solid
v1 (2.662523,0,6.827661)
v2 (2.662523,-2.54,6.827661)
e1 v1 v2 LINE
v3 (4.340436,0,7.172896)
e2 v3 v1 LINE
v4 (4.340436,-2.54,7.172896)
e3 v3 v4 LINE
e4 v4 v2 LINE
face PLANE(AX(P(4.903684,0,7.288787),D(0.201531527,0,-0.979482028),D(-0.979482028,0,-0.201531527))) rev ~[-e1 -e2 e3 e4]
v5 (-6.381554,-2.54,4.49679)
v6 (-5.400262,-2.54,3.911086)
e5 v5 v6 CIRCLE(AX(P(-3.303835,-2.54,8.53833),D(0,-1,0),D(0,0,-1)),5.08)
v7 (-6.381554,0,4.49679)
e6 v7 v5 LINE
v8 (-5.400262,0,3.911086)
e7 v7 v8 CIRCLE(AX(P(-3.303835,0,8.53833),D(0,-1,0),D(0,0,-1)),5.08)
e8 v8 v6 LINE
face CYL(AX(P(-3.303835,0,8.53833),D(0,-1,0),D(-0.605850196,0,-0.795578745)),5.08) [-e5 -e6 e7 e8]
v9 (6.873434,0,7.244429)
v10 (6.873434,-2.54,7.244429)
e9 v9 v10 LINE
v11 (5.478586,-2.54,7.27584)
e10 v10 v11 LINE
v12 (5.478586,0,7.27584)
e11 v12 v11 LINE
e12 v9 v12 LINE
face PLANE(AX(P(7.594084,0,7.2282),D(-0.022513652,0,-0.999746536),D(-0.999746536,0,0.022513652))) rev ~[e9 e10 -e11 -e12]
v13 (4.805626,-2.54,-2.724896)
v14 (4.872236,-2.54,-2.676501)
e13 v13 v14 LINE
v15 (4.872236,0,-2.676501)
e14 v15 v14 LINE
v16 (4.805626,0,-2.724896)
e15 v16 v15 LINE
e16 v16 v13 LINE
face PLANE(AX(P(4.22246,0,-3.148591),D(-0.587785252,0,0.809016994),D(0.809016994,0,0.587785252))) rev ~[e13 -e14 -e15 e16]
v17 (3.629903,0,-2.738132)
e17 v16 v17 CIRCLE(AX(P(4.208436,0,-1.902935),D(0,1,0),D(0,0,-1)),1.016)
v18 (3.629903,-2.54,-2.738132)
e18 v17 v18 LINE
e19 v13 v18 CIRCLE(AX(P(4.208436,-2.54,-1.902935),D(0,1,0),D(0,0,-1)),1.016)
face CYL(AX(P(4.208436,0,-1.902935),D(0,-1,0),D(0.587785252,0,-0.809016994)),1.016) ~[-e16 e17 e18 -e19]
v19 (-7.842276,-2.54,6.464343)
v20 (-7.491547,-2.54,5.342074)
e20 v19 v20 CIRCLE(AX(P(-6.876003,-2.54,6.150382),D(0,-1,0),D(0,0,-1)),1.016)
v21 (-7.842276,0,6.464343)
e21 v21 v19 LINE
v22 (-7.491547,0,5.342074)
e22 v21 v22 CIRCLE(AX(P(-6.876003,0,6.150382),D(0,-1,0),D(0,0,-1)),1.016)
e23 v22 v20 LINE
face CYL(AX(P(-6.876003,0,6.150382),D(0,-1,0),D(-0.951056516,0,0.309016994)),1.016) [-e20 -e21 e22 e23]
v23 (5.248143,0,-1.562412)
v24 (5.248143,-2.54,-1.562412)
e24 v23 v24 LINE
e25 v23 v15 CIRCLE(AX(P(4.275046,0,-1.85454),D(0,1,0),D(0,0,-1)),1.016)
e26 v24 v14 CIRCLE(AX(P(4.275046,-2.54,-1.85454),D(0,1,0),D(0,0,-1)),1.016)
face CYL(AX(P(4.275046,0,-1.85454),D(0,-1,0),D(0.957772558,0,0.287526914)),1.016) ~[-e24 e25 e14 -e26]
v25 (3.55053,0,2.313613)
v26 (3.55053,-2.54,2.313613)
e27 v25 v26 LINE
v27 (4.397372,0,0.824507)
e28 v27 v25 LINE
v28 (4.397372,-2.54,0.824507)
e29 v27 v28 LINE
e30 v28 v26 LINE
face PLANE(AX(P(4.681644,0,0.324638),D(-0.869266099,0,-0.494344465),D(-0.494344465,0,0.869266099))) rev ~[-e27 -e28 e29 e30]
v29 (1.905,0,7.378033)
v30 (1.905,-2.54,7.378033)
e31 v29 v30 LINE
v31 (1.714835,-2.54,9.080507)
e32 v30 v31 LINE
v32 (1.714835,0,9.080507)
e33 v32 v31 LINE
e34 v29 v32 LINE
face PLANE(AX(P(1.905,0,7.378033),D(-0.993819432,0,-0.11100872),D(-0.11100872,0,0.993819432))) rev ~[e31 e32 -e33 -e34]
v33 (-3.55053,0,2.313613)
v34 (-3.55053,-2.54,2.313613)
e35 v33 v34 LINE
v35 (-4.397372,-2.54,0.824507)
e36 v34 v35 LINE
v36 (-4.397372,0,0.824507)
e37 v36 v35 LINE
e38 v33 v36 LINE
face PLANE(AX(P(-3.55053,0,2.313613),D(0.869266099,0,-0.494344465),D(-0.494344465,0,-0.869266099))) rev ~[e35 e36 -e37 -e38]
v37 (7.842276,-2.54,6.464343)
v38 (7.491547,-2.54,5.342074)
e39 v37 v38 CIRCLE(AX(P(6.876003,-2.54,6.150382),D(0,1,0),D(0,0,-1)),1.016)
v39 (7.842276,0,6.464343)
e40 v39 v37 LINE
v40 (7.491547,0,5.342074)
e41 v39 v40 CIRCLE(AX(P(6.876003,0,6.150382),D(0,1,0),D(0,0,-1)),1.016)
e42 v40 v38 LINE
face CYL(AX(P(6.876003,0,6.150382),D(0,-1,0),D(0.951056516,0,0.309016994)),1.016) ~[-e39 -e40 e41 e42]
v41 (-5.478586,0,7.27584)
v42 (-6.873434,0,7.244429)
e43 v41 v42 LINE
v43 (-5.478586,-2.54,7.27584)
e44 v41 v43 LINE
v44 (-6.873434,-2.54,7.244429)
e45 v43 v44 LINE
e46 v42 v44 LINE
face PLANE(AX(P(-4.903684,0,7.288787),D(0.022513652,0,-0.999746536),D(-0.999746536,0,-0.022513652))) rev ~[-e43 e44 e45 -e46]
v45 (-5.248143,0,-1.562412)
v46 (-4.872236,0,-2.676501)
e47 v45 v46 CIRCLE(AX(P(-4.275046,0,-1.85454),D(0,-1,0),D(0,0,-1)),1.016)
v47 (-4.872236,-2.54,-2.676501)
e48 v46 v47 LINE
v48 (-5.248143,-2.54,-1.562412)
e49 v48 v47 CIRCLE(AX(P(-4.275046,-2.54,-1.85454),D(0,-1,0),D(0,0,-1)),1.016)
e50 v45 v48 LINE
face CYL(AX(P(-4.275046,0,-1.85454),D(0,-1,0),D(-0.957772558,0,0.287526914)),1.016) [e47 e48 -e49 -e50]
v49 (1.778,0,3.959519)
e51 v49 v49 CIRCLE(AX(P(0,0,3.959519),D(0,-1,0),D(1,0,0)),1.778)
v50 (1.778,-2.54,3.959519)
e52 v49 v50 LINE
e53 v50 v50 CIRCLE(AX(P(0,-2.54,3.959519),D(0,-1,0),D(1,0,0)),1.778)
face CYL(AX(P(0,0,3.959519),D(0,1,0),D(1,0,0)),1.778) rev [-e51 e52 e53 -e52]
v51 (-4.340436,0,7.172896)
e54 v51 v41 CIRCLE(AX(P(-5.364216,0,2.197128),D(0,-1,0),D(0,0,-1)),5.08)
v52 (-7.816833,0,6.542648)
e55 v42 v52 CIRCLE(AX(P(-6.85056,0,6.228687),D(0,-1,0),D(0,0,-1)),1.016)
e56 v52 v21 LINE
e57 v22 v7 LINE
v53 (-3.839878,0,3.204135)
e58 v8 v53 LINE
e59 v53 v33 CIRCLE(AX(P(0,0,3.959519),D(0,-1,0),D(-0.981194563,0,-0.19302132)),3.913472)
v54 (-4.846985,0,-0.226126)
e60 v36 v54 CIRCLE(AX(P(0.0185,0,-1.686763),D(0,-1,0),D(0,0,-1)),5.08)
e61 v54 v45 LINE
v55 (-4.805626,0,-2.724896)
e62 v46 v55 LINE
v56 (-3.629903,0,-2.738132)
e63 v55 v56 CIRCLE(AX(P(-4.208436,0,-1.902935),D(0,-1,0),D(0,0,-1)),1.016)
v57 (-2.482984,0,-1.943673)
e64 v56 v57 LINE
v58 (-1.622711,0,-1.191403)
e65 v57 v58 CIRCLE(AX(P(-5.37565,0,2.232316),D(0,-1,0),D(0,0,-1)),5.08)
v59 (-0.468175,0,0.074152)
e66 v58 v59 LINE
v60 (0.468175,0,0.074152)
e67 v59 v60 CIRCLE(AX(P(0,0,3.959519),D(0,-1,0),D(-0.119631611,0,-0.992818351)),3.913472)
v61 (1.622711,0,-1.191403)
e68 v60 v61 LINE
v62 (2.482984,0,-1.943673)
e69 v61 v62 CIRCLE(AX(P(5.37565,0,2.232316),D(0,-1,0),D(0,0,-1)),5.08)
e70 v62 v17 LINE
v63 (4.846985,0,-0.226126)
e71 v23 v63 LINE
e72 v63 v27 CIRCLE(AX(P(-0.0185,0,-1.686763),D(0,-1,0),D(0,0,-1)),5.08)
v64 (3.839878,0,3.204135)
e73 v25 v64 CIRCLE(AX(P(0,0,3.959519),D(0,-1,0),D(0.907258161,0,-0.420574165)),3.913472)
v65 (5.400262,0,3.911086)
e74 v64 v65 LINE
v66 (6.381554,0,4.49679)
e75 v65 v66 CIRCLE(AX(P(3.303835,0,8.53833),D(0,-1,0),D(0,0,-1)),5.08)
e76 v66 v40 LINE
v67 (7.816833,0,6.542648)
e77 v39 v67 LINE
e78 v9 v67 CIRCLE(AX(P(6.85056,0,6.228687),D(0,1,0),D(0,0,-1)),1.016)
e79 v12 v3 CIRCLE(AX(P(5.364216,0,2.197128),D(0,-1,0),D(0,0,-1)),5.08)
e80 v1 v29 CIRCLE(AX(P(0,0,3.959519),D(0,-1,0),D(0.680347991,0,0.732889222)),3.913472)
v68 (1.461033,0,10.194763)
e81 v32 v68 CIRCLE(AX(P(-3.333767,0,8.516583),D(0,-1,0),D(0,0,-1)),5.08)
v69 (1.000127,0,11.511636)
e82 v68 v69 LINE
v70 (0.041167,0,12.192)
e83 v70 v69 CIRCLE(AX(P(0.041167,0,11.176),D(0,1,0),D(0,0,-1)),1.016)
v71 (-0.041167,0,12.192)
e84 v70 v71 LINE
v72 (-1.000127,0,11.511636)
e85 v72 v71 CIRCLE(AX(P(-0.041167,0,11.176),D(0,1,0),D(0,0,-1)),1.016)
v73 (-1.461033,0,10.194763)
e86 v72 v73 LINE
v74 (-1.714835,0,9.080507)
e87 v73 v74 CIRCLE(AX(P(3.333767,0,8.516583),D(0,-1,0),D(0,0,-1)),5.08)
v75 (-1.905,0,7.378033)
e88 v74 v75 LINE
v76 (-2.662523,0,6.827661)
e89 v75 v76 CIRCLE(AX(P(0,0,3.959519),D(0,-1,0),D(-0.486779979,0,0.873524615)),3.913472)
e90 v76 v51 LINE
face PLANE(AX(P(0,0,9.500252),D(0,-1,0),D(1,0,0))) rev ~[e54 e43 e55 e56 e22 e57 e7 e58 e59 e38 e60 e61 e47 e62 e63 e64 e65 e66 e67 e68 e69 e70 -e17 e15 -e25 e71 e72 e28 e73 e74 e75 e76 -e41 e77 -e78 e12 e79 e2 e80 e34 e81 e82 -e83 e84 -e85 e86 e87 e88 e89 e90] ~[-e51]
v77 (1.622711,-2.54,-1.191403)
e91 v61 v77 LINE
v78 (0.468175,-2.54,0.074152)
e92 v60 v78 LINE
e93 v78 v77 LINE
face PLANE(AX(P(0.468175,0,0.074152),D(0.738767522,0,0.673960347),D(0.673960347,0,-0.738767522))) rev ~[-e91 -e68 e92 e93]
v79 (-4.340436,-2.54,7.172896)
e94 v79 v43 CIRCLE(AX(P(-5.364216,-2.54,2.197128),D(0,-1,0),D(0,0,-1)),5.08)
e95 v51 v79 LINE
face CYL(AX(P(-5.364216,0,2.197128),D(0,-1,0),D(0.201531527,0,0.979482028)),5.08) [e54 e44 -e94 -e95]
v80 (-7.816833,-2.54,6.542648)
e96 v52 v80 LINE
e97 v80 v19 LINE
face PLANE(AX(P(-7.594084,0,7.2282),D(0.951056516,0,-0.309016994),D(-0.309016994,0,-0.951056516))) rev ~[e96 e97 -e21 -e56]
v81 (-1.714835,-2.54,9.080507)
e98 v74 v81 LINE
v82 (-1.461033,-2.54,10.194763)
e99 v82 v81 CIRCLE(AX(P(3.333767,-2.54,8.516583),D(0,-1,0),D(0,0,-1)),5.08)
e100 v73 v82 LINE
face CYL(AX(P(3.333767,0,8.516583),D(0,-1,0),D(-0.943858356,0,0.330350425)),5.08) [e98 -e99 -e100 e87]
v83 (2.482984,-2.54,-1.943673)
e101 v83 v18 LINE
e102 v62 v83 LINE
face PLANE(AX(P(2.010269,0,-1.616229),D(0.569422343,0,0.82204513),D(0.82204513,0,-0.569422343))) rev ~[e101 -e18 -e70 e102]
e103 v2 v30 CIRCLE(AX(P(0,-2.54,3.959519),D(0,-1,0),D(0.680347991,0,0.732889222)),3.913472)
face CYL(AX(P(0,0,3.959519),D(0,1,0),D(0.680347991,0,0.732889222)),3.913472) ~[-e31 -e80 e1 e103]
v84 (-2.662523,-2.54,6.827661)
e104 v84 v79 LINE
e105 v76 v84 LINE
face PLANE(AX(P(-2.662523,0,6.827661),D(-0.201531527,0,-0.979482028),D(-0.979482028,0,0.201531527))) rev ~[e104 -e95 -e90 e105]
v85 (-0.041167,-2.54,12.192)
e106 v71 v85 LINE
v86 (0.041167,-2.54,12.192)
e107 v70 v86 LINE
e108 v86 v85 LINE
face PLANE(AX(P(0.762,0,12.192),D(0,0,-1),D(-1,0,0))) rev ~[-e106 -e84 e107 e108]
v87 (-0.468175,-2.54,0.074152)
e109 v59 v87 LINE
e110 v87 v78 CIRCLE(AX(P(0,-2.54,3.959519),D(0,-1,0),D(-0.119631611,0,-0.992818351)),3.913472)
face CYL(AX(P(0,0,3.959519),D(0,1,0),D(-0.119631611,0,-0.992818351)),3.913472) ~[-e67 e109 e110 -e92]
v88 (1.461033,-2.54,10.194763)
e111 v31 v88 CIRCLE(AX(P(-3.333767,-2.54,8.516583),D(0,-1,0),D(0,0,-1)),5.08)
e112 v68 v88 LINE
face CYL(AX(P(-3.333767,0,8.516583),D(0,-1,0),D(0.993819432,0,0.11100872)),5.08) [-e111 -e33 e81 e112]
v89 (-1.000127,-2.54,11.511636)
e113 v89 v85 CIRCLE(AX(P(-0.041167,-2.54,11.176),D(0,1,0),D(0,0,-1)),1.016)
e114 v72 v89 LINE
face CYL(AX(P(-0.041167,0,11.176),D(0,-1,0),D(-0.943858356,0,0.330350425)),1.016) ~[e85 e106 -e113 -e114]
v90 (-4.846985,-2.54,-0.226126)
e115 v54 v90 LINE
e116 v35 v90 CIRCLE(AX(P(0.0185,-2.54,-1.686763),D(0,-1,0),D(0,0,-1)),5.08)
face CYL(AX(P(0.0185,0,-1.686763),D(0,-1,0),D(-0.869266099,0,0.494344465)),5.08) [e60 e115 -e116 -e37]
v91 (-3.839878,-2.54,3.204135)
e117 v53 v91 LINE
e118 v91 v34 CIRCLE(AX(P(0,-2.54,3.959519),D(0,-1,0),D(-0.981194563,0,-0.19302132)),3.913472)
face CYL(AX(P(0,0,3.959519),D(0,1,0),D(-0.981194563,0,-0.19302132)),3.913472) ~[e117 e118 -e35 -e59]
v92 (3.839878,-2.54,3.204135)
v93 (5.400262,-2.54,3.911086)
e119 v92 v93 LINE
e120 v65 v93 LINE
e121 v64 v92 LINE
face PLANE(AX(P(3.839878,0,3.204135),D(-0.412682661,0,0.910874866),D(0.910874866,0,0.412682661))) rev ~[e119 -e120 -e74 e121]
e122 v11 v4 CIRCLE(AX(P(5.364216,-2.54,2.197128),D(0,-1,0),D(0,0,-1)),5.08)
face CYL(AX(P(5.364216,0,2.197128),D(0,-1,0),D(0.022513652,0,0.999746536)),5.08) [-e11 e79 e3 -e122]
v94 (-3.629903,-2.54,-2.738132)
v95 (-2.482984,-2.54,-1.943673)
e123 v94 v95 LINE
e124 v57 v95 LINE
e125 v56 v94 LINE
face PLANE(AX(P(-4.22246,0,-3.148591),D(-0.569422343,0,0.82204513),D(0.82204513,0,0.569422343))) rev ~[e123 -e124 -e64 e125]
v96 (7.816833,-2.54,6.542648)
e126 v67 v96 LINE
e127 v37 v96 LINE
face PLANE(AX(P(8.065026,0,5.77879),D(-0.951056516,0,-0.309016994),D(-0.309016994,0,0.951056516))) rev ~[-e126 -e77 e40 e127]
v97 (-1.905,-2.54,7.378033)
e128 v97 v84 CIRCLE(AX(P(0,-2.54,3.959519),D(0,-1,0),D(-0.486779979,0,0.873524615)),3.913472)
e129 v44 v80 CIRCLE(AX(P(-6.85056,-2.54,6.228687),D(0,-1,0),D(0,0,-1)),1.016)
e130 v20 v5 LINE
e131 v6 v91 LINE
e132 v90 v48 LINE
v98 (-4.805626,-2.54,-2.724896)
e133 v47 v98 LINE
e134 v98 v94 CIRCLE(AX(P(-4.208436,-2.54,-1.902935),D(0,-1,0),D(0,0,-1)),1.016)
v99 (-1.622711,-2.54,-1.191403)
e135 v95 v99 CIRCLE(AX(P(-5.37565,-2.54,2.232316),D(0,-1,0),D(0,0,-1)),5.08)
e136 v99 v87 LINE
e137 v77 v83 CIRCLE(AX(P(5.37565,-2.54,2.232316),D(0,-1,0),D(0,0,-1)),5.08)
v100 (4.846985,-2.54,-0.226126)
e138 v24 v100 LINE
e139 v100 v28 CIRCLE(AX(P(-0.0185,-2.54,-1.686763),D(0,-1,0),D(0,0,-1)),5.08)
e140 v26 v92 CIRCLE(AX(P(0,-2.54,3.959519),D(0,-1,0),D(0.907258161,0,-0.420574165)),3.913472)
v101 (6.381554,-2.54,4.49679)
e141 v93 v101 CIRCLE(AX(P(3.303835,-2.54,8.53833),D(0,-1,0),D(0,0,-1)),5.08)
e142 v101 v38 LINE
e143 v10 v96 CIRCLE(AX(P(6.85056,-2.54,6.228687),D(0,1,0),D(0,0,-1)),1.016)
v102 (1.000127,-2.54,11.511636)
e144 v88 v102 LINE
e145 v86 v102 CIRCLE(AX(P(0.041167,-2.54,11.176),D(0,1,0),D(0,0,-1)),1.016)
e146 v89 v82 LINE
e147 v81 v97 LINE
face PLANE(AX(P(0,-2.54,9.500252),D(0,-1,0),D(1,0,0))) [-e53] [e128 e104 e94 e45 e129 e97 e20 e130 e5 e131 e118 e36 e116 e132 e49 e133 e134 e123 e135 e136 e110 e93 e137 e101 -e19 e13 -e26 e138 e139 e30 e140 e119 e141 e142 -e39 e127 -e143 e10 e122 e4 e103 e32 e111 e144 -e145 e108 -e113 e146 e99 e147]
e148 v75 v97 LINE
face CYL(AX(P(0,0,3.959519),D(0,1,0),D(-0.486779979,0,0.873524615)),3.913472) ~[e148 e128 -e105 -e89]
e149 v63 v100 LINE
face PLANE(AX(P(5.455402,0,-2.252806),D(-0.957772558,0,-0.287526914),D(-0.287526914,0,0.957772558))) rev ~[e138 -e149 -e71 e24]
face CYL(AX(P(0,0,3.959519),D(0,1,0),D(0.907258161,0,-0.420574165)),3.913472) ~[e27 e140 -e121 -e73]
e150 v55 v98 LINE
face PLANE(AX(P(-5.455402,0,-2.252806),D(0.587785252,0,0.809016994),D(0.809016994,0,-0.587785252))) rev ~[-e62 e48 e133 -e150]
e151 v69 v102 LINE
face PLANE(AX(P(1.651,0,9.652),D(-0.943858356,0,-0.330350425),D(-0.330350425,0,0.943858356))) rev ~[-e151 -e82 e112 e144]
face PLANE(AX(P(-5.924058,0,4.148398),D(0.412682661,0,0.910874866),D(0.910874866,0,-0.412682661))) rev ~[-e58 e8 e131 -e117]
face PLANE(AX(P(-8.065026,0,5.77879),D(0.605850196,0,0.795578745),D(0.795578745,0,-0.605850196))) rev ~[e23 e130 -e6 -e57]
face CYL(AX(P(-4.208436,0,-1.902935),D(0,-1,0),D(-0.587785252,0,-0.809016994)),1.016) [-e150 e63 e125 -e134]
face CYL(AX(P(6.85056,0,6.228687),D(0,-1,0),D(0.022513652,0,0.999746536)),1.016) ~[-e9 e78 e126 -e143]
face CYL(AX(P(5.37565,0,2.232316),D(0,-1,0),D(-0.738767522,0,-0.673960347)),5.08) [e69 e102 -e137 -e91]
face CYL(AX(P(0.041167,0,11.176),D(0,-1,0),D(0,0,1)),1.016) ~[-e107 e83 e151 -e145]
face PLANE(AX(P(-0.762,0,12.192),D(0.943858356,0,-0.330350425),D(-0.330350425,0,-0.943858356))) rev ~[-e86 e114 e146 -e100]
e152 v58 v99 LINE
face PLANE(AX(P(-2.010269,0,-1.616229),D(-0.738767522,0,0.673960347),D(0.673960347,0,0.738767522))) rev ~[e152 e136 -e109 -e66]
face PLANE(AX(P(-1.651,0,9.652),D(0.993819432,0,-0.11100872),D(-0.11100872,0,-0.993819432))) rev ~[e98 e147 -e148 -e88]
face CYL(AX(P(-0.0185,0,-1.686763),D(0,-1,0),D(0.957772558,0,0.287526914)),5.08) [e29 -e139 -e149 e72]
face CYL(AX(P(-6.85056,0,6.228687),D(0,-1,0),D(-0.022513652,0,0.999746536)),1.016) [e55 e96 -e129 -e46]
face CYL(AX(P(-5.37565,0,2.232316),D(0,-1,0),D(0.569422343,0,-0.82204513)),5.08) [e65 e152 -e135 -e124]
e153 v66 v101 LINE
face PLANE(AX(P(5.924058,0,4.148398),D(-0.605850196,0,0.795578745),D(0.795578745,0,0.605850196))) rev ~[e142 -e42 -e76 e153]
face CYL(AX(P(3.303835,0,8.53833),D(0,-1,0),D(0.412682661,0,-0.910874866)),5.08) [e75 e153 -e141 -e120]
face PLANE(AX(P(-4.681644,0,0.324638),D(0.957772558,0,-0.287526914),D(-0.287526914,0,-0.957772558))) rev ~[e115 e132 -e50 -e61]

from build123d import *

# Parameters (mm, degrees)
F0_R     = 1.778
F1_DEPTH = 2.54
F2_R     = 5.08
F3_R     = 1.016


# Not quite as in the source:
# - a feature names something its author has since deleted; it is built from what else it names


with BuildPart() as f1:
    # F0 (on Front) → F1 (new body)
    with BuildSketch(Plane.XZ):
        with BuildLine():
            Line((0.762, 12.192), (-0.762, 12.192))
            Line((-0.762, 12.192), (-1.651, 9.652))
            Line((-1.651, 9.652), (-1.905, 7.3780332745))
            ThreePointArc((-1.905, 7.3780332745), (0, 7.8729912016), (1.905, 7.3780332745))
            Line((1.905, 7.3780332745), (1.651, 9.652))
            Line((1.651, 9.652), (0.762, 12.192))
        make_face()
        with BuildLine():
            ThreePointArc((1.905, 7.3780332745), (0, 7.8729912016), (-1.905, 7.3780332745))
            ThreePointArc((-1.905, 7.3780332745), (-2.3002813477, 7.1255844849), (-2.6625230681, 6.8276605496))
            ThreePointArc((-2.6625230681, 6.8276605496), (-3.7219334042, 5.168848297), (-3.8398778167, 3.2041352225))
            ThreePointArc((-3.8398778167, 3.2041352225), (-3.7219334042, 2.7501893548), (-3.5505297519, 2.3136134471))
            ThreePointArc((-3.5505297519, 2.3136134471), (-2.3002813477, 0.793453167), (-0.4681750033, 0.0741516359))
            ThreePointArc((-0.4681750033, 0.0741516359), (0, 0.0460464502), (0.4681750033, 0.0741516359))
            ThreePointArc((0.4681750033, 0.0741516359), (2.3002813477, 0.793453167), (3.5505297519, 2.3136134471))
            ThreePointArc((3.5505297519, 2.3136134471), (3.7219334042, 2.7501893548), (3.8398778167, 3.2041352225))
            ThreePointArc((3.8398778167, 3.2041352225), (3.8950302821, 3.5800387384), (3.9134723757, 3.9595188259))
            ThreePointArc((3.9134723757, 3.9595188259), (3.5871281349, 5.5240563868), (2.6625230681, 6.8276605496))
            ThreePointArc((2.6625230681, 6.8276605496), (2.3002813477, 7.1255844849), (1.905, 7.3780332745))
        make_face()
        with Locations((0, 3.9595188259)):
            Circle(F0_R, mode=Mode.SUBTRACT)
        with BuildLine():
            ThreePointArc((-3.8398778167, 3.2041352225), (-3.7219334042, 5.168848297), (-2.6625230681, 6.8276605496))
            Line((-2.6625230681, 6.8276605496), (-4.9036842568, 7.2887865573))
            Line((-4.9036842568, 7.2887865573), (-7.5940839162, 7.22820048))
            Line((-7.5940839162, 7.22820048), (-8.0650258156, 5.7787903492))
            Line((-8.0650258156, 5.7787903492), (-5.9240583722, 4.1483979405))
            Line((-5.9240583722, 4.1483979405), (-3.8398778167, 3.2041352225))
        make_face()
        with BuildLine():
            Line((4.9036842568, 7.2887865573), (2.6625230681, 6.8276605496))
            ThreePointArc((2.6625230681, 6.8276605496), (3.5871281349, 5.5240563868), (3.9134723757, 3.9595188259))
            ThreePointArc((3.9134723757, 3.9595188259), (3.8950302821, 3.5800387384), (3.8398778167, 3.2041352225))
            Line((3.8398778167, 3.2041352225), (5.9240583722, 4.1483979405))
            Line((5.9240583722, 4.1483979405), (8.0650258156, 5.7787903492))
            Line((8.0650258156, 5.7787903492), (7.5940839162, 7.22820048))
            Line((7.5940839162, 7.22820048), (4.9036842568, 7.2887865573))
        make_face()
        with BuildLine():
            ThreePointArc((-0.4681750033, 0.0741516359), (-2.3002813477, 0.793453167), (-3.5505297519, 2.3136134471))
            Line((-3.5505297519, 2.3136134471), (-4.6816435408, 0.3246382675))
            Line((-4.6816435408, 0.3246382675), (-5.4554019736, -2.2528059875))
            Line((-5.4554019736, -2.2528059875), (-4.2224600742, -3.148590712))
            Line((-4.2224600742, -3.148590712), (-2.0102694254, -1.6162286356))
            Line((-2.0102694254, -1.6162286356), (-0.4681750033, 0.0741516359))
        make_face()
        with BuildLine():
            Line((4.6816435408, 0.3246382675), (3.5505297519, 2.3136134471))
            ThreePointArc((3.5505297519, 2.3136134471), (2.3002813477, 0.793453167), (0.4681750033, 0.0741516359))
            Line((0.4681750033, 0.0741516359), (2.0102694254, -1.6162286356))
            Line((2.0102694254, -1.6162286356), (4.2224600742, -3.148590712))
            Line((4.2224600742, -3.148590712), (5.4554019736, -2.2528059875))
            Line((5.4554019736, -2.2528059875), (4.6816435408, 0.3246382675))
        make_face()
    extrude(amount=F1_DEPTH)

    # F2
    f2_edges = [f1.edges().sort_by_distance(p)[0] for p in [
        (1.651, -1.27, 9.652),
        (-4.903684, -1.27, 7.288787),
        (-4.681644, -1.27, 0.324638),
        (2.010269, -1.27, -1.616229),
        (5.924058, -1.27, 4.148398),
        (-1.651, -1.27, 9.652),
        (-5.924058, -1.27, 4.148398),
        (-2.010269, -1.27, -1.616229),
        (4.681644, -1.27, 0.324638),
        (4.903684, -1.27, 7.288787),
    ]]
    fillet(f2_edges, radius=F2_R)

    # F3
    f3_edges = [f1.edges().sort_by_distance(p)[0] for p in [
        (0.762, -1.27, 12.192),
        (-0.762, -1.27, 12.192),
        (-7.594084, -1.27, 7.2282),
        (-8.065026, -1.27, 5.77879),
        (-5.455402, -1.27, -2.252806),
        (-4.22246, -1.27, -3.148591),
        (4.22246, -1.27, -3.148591),
        (5.455402, -1.27, -2.252806),
        (8.065026, -1.27, 5.77879),
        (7.594084, -1.27, 7.2282),
    ]]
    fillet(f3_edges, radius=F3_R)


solid = f1.part
